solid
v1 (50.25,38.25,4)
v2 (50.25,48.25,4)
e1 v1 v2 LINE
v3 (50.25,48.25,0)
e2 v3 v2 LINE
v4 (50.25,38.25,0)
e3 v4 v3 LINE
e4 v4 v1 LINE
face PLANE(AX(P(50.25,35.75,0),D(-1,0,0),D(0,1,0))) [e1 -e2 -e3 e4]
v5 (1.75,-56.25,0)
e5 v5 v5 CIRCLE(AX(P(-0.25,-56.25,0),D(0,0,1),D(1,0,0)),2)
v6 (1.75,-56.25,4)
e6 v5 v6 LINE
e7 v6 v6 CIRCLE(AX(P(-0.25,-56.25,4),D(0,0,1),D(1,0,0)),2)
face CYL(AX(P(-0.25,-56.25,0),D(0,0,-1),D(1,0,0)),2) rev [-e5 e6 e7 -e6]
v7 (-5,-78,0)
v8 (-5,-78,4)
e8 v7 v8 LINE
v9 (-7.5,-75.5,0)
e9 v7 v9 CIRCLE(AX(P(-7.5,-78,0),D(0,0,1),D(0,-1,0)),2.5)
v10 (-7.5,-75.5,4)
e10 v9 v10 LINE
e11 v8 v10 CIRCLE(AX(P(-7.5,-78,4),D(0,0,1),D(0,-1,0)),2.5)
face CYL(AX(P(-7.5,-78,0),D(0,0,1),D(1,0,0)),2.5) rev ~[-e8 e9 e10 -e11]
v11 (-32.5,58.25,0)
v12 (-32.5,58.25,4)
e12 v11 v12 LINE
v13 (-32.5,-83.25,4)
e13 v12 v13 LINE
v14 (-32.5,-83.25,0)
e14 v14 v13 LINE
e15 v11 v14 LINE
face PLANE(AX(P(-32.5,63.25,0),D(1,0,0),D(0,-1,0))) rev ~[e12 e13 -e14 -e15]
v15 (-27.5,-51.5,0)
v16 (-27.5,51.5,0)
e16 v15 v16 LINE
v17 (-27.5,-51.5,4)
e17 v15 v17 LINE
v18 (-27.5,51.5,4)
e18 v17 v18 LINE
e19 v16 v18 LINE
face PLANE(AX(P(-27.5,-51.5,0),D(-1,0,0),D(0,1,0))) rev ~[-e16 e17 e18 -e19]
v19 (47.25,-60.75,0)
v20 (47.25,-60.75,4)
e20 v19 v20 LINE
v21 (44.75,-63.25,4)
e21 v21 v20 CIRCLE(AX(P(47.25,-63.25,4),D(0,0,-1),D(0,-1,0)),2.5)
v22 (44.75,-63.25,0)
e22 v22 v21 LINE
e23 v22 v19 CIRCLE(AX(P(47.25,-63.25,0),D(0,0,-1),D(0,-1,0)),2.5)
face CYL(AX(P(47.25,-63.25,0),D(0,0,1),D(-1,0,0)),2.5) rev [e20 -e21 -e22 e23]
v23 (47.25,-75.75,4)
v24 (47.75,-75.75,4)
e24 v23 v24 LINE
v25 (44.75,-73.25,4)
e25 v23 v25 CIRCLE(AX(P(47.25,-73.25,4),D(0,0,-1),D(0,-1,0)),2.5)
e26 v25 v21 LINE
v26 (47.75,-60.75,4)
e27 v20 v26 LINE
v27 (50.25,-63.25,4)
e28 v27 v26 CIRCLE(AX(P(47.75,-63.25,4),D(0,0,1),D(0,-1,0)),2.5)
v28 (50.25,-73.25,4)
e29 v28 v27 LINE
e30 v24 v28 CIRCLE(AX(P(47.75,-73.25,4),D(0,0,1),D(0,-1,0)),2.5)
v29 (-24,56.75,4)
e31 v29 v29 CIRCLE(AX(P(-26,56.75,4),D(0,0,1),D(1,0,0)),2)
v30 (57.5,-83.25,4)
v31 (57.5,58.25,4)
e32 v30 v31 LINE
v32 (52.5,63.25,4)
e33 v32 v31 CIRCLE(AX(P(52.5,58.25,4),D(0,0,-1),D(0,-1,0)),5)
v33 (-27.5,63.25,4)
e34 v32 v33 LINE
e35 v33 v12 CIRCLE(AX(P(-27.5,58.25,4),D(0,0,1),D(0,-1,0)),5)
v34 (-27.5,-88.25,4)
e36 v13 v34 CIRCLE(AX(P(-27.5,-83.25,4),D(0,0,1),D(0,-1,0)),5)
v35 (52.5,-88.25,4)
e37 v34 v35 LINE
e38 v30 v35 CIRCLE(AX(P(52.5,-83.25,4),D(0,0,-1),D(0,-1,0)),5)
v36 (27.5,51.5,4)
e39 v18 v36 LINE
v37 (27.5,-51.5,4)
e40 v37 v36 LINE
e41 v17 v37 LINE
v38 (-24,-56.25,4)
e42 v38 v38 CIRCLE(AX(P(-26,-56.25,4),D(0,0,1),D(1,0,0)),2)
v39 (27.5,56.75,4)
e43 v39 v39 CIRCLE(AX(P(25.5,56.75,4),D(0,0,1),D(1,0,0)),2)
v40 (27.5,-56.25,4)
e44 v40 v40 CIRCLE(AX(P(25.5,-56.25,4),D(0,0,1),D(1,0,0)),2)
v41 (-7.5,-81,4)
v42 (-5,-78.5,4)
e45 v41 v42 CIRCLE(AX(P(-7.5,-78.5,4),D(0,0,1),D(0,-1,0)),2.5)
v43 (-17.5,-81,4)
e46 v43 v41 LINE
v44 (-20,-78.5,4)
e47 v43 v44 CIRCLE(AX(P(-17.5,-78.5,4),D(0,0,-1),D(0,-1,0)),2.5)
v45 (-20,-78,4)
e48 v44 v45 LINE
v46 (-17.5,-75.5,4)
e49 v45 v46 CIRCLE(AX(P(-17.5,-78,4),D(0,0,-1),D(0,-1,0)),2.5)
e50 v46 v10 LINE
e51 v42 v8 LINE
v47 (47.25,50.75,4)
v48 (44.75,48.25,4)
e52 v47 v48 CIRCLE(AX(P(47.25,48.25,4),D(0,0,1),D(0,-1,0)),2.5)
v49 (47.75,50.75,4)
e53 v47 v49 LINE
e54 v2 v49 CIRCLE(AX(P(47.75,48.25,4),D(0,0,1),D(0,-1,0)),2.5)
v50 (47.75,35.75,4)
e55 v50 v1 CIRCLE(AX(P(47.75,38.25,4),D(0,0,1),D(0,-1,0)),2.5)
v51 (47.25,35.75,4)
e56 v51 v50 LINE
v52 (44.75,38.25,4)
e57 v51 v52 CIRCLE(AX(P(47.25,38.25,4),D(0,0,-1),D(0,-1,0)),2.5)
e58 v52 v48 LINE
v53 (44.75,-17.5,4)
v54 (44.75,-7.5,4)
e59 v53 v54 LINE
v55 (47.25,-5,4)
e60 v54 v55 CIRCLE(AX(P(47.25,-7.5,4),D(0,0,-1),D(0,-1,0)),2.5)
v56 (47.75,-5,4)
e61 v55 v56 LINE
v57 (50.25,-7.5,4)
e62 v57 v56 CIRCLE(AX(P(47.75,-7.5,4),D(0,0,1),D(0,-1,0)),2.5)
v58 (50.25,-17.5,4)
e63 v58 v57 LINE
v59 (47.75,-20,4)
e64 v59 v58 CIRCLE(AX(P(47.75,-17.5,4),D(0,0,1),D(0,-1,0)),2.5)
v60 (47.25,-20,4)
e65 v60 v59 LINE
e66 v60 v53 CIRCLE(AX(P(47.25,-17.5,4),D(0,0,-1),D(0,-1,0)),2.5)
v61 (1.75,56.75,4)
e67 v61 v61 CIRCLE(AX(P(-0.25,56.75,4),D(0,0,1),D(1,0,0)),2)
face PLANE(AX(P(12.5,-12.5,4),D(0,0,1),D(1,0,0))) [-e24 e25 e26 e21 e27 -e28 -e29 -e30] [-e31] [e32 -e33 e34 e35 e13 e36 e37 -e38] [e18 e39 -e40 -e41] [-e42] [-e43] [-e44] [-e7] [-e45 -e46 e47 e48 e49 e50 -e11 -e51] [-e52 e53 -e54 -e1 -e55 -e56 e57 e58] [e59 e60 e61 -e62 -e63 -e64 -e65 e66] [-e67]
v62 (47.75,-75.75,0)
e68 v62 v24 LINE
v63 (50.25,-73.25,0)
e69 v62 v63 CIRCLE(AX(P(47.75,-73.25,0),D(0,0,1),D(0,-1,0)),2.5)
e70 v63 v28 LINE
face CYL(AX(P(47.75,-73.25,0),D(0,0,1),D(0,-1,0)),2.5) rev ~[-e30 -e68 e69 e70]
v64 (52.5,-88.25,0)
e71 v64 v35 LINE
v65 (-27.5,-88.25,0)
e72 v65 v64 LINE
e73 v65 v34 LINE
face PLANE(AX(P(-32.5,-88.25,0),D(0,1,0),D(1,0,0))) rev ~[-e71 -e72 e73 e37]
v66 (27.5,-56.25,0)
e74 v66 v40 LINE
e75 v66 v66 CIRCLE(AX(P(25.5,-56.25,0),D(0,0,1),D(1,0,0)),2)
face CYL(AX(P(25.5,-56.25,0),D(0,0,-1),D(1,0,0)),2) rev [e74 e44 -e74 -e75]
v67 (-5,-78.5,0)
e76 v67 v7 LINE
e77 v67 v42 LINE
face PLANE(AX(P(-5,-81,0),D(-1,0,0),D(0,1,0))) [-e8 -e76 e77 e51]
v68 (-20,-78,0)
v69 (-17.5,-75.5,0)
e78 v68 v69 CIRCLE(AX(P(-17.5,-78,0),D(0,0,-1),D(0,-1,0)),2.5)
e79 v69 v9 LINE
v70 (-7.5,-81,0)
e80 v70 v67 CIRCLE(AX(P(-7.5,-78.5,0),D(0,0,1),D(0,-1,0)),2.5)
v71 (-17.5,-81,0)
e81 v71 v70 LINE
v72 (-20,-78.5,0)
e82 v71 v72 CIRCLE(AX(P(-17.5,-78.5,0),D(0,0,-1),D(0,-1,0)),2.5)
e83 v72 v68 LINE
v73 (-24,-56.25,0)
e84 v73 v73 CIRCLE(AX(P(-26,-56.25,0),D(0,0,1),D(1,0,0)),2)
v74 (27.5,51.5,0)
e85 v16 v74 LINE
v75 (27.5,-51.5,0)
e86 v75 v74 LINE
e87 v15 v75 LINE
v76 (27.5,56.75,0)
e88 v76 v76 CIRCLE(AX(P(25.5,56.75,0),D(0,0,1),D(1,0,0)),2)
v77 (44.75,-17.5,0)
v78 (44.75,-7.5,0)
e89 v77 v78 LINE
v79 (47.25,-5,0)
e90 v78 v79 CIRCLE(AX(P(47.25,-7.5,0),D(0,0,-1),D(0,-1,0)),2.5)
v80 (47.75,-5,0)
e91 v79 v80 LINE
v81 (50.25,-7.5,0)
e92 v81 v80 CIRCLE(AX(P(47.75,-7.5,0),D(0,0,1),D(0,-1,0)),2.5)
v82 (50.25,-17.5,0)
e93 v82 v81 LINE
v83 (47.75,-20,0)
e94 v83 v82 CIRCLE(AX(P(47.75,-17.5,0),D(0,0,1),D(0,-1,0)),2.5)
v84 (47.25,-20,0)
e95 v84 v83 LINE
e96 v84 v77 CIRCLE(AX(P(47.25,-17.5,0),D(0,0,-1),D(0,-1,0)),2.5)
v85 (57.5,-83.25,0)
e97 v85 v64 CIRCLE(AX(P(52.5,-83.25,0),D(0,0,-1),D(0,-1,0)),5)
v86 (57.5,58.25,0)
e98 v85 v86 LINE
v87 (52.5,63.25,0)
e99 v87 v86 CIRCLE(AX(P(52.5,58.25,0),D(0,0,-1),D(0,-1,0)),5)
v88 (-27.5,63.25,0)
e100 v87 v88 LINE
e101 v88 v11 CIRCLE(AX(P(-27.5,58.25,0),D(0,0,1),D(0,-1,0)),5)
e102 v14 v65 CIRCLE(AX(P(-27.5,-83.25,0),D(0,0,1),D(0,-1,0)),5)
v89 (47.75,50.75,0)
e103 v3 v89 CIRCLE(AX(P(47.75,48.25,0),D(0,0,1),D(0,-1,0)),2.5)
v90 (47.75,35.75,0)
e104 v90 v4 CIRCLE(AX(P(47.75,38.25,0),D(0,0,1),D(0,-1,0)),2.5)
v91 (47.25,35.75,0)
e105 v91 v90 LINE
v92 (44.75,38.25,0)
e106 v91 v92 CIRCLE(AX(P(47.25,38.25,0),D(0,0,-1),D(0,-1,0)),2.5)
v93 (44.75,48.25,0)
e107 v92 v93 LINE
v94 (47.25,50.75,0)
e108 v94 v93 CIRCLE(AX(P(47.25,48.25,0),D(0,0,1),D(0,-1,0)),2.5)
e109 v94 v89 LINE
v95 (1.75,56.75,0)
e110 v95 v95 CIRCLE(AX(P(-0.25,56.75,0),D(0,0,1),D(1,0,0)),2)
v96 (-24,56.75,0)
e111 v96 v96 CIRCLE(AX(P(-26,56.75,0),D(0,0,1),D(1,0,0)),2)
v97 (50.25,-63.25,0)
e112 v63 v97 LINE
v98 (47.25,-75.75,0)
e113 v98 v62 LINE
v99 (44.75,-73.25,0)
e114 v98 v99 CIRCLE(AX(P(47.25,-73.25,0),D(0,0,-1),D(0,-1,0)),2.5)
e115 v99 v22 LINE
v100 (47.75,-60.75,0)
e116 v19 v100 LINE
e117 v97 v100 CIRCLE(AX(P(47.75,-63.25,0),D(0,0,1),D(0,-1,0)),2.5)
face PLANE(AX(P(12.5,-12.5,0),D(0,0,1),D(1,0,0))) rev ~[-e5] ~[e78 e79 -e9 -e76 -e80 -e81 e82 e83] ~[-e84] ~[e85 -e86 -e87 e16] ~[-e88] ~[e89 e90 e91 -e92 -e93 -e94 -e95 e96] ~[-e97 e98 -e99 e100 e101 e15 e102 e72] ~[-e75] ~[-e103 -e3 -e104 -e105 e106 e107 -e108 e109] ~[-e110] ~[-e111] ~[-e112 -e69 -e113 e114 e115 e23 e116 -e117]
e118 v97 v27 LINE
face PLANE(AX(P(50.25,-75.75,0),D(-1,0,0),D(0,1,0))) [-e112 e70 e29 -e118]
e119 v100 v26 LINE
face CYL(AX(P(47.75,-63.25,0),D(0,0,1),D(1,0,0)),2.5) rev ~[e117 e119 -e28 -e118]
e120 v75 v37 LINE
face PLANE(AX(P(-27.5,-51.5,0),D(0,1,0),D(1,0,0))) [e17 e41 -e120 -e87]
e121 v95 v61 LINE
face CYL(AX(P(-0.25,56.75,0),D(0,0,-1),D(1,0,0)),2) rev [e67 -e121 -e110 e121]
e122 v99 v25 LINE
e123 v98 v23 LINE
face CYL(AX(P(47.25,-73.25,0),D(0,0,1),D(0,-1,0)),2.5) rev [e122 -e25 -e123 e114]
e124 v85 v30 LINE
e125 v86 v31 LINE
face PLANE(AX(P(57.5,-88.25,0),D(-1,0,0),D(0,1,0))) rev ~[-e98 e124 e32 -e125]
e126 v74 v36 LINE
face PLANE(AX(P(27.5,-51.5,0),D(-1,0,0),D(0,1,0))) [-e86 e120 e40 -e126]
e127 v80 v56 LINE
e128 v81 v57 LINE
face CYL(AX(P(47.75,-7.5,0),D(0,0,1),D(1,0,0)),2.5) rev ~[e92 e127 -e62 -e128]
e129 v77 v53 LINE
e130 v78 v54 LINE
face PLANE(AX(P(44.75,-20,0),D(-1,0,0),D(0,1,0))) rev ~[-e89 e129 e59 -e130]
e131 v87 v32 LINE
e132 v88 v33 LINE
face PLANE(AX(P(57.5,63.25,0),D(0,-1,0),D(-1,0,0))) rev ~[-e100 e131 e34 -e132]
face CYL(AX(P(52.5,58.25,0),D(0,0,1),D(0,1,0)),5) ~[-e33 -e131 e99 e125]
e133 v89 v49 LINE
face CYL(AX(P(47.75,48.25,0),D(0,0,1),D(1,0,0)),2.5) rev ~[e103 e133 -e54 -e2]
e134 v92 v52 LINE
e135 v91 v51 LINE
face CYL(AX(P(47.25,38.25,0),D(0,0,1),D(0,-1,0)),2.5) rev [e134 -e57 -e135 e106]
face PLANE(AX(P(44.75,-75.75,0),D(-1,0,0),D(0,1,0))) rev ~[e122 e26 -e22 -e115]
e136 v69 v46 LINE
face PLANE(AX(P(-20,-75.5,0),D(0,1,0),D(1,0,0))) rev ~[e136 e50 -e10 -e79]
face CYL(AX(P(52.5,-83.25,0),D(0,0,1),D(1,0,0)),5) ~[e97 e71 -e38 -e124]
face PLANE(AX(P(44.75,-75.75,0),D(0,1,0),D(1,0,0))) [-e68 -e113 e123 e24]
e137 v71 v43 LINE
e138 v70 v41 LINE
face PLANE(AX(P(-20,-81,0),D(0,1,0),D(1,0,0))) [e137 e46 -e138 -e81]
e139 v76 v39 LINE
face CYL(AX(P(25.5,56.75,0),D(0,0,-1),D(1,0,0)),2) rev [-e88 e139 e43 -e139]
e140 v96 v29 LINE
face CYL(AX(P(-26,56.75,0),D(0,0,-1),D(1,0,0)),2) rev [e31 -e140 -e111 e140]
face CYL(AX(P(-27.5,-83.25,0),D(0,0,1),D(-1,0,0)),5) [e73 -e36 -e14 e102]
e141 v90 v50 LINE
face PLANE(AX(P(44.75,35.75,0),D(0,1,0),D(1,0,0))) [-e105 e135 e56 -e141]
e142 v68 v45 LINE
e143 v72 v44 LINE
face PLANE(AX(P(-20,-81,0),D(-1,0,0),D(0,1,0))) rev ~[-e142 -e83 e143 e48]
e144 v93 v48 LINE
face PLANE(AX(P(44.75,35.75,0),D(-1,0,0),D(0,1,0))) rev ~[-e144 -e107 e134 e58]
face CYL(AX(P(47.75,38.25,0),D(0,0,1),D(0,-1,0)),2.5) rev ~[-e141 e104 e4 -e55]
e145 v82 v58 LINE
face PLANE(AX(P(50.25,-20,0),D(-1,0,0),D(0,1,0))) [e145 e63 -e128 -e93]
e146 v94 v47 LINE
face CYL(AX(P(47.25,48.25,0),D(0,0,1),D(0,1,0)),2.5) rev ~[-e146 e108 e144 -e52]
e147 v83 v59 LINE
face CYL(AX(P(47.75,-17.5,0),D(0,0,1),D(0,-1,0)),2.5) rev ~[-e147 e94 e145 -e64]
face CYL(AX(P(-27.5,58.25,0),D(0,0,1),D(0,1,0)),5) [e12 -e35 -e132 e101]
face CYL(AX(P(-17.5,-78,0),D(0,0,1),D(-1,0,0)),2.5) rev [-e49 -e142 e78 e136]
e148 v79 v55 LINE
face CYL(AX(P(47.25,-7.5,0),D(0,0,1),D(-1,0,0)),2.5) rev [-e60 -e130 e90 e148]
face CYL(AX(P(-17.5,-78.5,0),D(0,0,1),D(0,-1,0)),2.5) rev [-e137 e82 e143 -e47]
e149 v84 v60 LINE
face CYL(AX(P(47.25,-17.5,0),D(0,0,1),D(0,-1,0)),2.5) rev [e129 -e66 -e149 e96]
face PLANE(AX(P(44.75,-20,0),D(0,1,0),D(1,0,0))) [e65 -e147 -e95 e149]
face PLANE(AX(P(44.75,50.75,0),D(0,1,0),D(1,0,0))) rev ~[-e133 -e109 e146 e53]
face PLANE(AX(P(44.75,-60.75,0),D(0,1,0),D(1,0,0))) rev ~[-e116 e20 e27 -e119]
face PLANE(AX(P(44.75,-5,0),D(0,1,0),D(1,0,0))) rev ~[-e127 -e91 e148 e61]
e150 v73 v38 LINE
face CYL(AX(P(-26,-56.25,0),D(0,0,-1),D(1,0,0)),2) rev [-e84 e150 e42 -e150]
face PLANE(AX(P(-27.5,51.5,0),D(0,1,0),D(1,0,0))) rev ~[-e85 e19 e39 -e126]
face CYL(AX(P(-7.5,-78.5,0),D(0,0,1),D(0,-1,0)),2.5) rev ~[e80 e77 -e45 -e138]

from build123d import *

# Parameters (mm, degrees)
F0_W     = 15
F0_H     = 5.5
F0_R     = 2
F0_W_2   = 5.5
F0_H_2   = 15
F0_W_3   = 55
F0_H_3   = 103
F1_DEPTH = 4
F2_R     = 2.5
F3_R     = 5


# Not quite as in the source:
# - a feature names something its author has since deleted; it is built from what else it names


with BuildPart() as f1:
    # F0 (on Top) → F1 (new body)
    with BuildSketch(Plane.XY):
        Polygon((57.5, 63.25), (32.5, 63.25), (-32.5, 63.25), (-32.5, -63.25), (-32.5, -88.25), (57.5, -88.25), align=None)
        with Locations((-12.5, -78.25)):
            Rectangle(F0_W, F0_H, mode=Mode.SUBTRACT)
        with Locations((-26, -56.25)):
            Circle(F0_R, mode=Mode.SUBTRACT)
        with Locations((-0.25, -56.25)):
            Circle(F0_R, mode=Mode.SUBTRACT)
        with Locations((25.5, -56.25)):
            Circle(F0_R, mode=Mode.SUBTRACT)
        with Locations((47.5, -68.25)):
            Rectangle(F0_W_2, F0_H_2, mode=Mode.SUBTRACT)
        Rectangle(F0_W_3, F0_H_3, mode=Mode.SUBTRACT)
        with Locations((-26, 56.75)):
            Circle(F0_R, mode=Mode.SUBTRACT)
        with Locations((-0.25, 56.75)):
            Circle(F0_R, mode=Mode.SUBTRACT)
        with Locations((47.5, -12.5)):
            Rectangle(F0_W_2, F0_H_2, mode=Mode.SUBTRACT)
        with Locations((25.5, 56.75)):
            Circle(F0_R, mode=Mode.SUBTRACT)
        with Locations((47.5, 43.25)):
            Rectangle(F0_W_2, F0_H_2, mode=Mode.SUBTRACT)
    extrude(amount=F1_DEPTH)

    # F2
    f2_edges = [f1.edges().sort_by_distance(p)[0] for p in [
        (-20, -81, 2),
        (-20, -75.5, 2),
        (-5, -75.5, 2),
        (-5, -81, 2),
        (50.25, -60.75, 2),
        (50.25, -75.75, 2),
        (44.75, -75.75, 2),
        (44.75, -60.75, 2),
        (44.75, -5, 2),
        (50.25, -5, 2),
        (50.25, -20, 2),
        (44.75, -20, 2),
        (44.75, 35.75, 2),
        (44.75, 50.75, 2),
        (50.25, 50.75, 2),
        (50.25, 35.75, 2),
    ]]
    fillet(f2_edges, radius=F2_R)

    # F3
    f3_edges = [f1.edges().sort_by_distance(p)[0] for p in [
        (-32.5, 63.25, 2),
        (-32.5, -88.25, 2),
        (57.5, -88.25, 2),
        (57.5, 63.25, 2),
    ]]
    fillet(f3_edges, radius=F3_R)


solid = f1.part
